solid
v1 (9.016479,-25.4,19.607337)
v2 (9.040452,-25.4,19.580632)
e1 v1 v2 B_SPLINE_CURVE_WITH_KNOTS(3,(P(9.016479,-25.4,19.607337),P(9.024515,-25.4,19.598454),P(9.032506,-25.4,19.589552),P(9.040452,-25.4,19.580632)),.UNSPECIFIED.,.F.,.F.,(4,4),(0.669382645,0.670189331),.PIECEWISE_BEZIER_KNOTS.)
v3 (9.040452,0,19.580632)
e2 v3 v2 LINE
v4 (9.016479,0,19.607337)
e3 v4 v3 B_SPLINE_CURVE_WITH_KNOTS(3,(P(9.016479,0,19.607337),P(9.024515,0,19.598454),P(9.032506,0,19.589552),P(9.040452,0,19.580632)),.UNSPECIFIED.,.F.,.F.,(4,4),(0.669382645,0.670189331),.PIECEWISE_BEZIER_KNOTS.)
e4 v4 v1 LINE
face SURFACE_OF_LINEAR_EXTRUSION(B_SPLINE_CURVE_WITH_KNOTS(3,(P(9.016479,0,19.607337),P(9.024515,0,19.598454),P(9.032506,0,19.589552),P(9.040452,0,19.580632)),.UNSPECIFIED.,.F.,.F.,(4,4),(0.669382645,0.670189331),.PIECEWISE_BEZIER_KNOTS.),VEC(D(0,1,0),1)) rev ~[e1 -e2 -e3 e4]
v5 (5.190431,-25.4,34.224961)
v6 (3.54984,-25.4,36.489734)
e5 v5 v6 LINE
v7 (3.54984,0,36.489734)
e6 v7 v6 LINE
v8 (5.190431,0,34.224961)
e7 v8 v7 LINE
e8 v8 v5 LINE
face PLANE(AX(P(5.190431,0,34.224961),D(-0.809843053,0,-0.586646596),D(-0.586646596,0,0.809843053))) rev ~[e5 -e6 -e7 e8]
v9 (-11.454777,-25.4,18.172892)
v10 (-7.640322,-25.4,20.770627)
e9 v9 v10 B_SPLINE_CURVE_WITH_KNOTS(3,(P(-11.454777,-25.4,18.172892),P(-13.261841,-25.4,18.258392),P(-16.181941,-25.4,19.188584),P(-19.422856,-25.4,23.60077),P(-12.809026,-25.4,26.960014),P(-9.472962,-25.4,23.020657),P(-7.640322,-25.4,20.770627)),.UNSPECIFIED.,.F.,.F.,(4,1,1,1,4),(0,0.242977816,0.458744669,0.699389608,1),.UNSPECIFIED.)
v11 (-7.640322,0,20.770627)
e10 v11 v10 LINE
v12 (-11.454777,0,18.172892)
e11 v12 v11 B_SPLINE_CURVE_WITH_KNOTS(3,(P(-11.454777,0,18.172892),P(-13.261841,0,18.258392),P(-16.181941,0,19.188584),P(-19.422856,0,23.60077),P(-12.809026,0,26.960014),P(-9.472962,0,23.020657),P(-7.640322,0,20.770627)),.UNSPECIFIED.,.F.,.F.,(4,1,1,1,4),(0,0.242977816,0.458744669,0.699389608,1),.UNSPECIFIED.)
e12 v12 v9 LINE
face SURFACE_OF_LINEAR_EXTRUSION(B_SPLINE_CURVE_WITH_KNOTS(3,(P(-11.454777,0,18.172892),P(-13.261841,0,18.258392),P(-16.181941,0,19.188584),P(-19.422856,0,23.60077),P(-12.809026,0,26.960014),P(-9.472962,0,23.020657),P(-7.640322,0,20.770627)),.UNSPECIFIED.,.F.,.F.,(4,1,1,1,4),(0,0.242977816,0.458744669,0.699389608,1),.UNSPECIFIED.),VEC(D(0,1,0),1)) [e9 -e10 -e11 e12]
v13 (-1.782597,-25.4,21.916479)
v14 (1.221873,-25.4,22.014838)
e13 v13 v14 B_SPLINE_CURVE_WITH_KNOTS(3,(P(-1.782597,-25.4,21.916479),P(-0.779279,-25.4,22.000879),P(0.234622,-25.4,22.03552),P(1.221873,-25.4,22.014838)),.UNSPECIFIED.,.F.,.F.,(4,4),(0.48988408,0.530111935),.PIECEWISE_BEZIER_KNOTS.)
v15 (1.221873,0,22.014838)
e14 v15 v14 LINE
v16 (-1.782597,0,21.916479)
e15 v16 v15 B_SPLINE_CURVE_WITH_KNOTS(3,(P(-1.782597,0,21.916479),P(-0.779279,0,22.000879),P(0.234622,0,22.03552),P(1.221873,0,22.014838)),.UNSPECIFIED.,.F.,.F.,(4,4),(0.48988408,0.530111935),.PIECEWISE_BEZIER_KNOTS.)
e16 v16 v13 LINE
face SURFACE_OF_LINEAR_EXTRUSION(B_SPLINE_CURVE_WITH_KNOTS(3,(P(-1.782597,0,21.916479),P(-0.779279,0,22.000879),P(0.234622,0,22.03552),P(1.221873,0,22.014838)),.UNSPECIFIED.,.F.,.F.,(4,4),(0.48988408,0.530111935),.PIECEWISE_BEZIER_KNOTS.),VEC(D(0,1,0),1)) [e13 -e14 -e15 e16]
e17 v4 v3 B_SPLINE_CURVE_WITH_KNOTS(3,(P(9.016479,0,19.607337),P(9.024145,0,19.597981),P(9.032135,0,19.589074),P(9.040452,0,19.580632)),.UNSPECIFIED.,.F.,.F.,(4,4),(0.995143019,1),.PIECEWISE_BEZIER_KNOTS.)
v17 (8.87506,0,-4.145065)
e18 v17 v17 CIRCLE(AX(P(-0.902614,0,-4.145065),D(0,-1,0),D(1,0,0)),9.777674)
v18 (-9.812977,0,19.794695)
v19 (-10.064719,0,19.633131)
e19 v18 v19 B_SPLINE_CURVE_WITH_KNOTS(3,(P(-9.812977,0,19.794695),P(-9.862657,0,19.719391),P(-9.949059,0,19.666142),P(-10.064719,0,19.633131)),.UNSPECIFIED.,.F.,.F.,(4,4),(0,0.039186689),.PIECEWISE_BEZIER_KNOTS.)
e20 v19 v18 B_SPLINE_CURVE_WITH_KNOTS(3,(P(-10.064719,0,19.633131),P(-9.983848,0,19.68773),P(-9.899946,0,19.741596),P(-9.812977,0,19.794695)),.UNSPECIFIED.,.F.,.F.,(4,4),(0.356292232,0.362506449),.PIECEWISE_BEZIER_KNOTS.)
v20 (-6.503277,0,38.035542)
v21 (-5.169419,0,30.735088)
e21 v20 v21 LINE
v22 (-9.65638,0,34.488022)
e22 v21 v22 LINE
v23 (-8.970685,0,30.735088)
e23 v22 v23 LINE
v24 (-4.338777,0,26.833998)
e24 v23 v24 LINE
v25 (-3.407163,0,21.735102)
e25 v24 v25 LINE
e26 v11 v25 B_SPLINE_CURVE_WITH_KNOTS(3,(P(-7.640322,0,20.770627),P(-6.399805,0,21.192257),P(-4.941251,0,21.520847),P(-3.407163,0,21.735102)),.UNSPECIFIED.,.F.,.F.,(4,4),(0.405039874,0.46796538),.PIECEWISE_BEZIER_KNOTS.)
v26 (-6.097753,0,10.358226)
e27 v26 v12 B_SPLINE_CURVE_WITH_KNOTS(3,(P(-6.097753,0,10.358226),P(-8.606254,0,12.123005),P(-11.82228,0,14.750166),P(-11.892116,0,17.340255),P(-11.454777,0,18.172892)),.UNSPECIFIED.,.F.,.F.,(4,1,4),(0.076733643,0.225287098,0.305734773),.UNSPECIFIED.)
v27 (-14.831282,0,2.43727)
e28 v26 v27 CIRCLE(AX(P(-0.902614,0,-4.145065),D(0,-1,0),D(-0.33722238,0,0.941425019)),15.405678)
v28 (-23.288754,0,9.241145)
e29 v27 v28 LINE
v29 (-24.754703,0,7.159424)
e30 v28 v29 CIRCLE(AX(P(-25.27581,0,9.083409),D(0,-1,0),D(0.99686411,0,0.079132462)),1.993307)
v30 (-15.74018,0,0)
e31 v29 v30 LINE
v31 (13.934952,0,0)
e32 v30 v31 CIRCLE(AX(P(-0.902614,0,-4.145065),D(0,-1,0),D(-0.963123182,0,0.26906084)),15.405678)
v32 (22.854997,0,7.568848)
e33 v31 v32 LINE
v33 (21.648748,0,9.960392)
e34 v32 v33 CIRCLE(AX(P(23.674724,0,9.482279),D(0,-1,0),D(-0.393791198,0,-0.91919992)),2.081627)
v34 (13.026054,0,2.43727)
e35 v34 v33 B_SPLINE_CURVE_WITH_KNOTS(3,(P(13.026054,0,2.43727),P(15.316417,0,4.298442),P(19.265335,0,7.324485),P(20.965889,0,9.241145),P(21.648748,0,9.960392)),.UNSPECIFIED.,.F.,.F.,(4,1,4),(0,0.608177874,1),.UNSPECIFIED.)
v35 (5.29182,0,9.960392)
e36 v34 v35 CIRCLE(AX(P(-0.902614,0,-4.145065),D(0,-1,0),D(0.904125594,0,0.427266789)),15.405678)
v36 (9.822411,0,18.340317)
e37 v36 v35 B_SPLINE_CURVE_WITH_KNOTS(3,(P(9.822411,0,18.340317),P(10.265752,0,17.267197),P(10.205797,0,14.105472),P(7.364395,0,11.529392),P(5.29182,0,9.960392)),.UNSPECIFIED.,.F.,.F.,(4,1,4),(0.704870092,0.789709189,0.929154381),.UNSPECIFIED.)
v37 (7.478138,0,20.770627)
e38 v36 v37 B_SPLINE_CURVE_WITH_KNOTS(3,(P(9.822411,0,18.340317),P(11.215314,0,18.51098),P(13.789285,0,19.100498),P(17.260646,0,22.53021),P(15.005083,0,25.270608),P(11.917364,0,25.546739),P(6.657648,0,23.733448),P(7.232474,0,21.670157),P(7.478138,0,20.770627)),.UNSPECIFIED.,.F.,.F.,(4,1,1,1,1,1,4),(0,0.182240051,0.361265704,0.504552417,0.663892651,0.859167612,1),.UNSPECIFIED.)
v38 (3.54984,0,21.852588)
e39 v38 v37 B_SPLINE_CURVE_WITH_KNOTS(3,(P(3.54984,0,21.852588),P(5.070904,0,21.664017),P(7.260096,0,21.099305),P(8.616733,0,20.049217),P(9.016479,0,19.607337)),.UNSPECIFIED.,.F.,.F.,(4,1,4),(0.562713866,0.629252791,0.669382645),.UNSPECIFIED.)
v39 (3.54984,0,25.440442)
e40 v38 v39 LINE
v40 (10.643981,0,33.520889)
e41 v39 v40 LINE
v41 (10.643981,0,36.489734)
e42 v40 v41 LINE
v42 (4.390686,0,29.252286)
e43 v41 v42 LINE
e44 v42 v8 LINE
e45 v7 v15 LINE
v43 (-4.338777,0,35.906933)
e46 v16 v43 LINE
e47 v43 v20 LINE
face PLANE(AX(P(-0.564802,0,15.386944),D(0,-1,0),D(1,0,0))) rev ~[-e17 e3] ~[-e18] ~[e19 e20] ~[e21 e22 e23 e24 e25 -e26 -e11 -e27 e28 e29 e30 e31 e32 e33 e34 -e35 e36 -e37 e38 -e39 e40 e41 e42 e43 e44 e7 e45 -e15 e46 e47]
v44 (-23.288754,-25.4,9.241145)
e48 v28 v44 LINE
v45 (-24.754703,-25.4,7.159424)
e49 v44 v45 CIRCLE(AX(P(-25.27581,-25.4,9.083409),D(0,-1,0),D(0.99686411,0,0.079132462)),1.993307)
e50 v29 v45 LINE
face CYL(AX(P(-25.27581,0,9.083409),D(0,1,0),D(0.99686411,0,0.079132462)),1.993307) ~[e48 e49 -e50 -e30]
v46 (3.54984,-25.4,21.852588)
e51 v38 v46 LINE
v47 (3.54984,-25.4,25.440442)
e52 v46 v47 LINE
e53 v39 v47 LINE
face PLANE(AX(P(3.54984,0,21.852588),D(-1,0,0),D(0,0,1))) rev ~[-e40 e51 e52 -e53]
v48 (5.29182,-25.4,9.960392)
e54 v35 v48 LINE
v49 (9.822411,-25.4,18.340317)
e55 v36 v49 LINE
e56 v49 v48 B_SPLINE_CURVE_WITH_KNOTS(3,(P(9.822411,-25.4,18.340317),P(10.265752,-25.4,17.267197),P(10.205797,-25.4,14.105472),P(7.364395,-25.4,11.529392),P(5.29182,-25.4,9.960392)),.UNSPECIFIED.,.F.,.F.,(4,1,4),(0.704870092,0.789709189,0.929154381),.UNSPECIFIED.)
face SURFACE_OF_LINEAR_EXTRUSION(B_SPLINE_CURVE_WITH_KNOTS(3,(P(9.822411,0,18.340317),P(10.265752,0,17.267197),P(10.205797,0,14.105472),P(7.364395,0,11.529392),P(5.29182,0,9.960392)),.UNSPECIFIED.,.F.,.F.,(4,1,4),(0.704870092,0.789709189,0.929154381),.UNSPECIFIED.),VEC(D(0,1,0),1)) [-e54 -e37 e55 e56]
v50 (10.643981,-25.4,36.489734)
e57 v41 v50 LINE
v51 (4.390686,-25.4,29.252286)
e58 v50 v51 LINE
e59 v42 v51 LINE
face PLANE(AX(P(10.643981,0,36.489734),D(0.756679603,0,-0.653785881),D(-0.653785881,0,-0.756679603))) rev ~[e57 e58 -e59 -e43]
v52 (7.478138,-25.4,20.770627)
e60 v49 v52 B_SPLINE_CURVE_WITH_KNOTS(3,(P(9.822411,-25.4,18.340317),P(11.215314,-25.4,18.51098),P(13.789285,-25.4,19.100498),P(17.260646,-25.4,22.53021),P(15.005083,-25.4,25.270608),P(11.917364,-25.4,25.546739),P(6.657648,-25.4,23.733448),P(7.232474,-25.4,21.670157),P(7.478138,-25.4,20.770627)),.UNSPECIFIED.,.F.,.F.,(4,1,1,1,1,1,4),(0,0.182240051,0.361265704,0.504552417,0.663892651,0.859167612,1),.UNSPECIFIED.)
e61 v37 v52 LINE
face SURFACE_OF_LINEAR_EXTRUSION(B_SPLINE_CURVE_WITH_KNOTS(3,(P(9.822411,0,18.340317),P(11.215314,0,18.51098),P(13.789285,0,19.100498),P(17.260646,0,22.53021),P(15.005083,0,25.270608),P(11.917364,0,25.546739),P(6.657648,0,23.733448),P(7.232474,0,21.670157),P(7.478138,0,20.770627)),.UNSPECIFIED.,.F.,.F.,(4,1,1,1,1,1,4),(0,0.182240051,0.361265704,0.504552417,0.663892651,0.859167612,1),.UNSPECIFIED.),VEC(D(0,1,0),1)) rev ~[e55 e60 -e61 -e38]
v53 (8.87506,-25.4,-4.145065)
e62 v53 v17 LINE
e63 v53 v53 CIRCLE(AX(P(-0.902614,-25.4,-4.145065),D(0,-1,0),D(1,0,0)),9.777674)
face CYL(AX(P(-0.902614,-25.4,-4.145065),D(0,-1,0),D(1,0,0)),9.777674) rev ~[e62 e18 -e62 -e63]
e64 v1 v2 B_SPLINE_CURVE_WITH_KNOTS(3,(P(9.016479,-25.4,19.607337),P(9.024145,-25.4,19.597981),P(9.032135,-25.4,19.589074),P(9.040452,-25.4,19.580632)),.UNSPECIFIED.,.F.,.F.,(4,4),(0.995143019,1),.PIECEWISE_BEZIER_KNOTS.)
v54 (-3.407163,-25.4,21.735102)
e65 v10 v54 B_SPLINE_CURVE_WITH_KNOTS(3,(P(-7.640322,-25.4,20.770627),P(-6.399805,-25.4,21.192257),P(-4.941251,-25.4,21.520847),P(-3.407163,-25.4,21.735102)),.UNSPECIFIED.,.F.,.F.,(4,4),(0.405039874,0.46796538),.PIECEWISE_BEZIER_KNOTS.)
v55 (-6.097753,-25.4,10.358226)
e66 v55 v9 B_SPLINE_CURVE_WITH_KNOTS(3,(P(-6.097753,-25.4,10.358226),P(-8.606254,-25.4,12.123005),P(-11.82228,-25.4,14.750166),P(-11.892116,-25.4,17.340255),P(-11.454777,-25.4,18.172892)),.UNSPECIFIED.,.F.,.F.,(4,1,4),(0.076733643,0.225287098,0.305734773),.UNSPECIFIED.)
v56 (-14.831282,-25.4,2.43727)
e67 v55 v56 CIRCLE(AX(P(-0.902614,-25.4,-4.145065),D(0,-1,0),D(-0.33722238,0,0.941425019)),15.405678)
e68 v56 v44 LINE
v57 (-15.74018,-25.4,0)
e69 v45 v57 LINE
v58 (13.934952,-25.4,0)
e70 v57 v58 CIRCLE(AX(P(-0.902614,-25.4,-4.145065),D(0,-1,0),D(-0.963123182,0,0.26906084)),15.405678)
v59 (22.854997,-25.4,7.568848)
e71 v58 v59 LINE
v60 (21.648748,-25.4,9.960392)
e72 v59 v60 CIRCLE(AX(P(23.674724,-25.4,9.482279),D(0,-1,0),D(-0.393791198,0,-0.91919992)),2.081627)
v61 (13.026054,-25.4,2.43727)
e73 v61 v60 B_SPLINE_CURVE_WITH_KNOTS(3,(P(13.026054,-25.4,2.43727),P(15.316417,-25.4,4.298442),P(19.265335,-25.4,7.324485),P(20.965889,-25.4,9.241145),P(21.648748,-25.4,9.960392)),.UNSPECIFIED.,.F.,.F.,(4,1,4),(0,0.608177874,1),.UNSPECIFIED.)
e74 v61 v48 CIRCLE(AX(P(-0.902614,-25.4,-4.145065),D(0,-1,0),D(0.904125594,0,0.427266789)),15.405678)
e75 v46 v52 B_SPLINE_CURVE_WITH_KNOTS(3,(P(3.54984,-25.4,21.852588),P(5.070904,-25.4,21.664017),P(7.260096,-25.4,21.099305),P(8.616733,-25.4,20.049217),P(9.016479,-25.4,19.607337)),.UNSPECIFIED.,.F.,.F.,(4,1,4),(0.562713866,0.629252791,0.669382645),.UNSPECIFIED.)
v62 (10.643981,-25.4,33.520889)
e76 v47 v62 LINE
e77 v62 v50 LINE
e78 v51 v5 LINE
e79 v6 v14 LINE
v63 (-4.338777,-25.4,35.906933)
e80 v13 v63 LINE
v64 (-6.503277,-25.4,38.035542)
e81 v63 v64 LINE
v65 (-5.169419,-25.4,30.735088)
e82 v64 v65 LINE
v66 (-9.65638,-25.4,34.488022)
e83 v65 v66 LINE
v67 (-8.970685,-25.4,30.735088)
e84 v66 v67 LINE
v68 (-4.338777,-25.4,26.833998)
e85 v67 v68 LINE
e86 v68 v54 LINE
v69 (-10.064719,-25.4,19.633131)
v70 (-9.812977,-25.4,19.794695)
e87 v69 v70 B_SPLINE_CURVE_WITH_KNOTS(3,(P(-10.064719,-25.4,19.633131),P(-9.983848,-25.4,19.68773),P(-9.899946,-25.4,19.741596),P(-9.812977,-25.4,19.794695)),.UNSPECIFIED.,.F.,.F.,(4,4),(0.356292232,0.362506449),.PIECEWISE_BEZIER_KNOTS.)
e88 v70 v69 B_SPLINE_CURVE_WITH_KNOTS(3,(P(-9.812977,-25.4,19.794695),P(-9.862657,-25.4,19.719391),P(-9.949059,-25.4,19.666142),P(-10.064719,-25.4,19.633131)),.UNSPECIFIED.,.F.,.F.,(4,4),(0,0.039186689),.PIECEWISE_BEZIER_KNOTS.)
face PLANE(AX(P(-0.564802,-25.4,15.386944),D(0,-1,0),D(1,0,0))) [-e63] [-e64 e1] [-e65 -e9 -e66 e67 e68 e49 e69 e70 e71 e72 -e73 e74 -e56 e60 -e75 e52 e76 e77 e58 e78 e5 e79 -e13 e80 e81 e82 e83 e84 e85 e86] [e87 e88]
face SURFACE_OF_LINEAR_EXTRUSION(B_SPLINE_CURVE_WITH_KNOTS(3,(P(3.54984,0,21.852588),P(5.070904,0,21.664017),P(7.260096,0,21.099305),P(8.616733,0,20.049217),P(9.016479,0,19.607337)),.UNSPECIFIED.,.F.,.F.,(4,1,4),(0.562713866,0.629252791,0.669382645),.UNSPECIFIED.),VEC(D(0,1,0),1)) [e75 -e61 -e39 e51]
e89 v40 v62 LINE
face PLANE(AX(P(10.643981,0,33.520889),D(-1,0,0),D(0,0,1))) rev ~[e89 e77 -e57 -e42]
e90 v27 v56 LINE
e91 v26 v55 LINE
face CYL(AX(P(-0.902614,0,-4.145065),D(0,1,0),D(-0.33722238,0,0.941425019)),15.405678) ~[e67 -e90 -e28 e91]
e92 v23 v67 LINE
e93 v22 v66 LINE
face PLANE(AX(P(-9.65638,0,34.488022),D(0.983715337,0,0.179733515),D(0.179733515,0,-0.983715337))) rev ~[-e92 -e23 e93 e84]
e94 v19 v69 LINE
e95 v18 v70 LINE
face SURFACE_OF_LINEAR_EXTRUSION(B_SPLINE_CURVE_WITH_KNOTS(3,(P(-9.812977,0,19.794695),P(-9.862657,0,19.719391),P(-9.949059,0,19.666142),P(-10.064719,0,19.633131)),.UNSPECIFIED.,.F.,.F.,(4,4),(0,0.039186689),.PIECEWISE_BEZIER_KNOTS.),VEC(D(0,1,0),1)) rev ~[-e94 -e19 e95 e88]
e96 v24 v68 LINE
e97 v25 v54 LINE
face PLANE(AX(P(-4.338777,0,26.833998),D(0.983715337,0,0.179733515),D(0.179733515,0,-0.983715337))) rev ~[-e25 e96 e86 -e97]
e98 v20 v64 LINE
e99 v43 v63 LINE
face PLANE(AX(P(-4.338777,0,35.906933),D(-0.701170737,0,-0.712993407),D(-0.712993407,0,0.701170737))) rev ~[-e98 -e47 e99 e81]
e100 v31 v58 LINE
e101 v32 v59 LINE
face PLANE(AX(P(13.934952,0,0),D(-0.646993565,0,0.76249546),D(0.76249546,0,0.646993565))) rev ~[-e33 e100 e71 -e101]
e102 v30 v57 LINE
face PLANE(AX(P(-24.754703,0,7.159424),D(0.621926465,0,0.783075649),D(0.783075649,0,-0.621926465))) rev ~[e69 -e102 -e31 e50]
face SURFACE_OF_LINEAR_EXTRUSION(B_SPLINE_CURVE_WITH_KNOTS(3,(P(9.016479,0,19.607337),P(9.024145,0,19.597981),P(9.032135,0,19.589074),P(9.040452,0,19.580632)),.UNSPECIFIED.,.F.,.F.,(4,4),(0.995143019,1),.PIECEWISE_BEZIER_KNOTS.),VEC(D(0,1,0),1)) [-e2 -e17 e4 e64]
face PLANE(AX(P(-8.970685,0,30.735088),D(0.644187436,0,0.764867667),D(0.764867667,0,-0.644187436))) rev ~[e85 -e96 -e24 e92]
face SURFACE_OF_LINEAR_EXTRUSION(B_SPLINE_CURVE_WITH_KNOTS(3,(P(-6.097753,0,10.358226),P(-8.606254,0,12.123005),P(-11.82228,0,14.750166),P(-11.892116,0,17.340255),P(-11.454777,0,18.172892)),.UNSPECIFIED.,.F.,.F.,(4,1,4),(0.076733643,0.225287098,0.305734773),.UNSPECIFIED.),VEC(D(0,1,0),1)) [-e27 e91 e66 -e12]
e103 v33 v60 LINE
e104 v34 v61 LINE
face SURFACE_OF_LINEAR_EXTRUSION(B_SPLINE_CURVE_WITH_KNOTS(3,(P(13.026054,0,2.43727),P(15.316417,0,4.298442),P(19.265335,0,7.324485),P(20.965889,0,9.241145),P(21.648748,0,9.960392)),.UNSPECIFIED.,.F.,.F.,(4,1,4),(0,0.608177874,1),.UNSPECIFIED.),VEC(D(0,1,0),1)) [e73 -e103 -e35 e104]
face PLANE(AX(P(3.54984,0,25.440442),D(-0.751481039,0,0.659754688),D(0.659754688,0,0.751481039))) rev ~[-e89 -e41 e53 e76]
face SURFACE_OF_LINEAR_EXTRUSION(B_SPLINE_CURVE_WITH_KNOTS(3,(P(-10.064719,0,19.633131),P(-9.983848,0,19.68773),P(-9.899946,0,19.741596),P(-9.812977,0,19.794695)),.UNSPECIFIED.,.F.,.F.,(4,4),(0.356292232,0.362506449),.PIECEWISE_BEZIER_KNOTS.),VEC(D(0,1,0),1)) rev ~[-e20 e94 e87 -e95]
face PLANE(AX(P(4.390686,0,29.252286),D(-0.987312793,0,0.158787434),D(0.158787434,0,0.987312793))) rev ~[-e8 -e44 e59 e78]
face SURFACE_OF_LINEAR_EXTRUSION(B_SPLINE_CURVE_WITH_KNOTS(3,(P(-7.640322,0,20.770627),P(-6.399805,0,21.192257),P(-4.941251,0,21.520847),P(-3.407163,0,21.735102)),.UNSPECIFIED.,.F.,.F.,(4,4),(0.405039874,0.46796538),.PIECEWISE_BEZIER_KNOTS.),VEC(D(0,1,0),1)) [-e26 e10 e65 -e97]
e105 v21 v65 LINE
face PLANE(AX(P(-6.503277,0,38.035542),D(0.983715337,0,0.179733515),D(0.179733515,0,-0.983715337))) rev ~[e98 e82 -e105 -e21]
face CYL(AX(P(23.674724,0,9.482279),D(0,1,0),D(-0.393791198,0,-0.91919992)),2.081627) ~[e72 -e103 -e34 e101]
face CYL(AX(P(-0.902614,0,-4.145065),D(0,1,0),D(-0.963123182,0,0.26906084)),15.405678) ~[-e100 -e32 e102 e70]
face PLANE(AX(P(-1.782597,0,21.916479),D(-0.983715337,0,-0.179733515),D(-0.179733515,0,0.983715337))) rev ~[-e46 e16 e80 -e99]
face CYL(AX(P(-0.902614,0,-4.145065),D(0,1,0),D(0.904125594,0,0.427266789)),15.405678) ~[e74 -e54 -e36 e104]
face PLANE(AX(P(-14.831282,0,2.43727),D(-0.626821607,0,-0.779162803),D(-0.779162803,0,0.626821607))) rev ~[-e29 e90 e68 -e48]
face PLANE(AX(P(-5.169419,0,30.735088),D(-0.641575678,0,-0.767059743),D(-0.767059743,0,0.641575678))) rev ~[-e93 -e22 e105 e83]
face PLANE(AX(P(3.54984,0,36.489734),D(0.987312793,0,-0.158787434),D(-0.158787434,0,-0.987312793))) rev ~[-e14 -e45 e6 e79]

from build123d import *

# Parameters (mm, degrees)
F0_R     = 1.2343431581
F0_R_2   = 1.1676202912
F1_DEPTH = 25.4
F2_R     = 9.777673903
F3_DEPTH = 25.4010001


# Not quite as in the source:
# - a feature names something its author has since deleted; it is built from what else it names


with BuildPart() as f1:
    # F0 (on Front) → F1 (new body)
    with BuildSketch(Plane.XZ):
        with BuildLine():
            ThreePointArc((-1.9968199656, 7.5688475417), (0, 9.5656675073), (1.9968199656, 7.5688475417))
            add(Edge.make_bspline(
                [(3.2633473205, 8.4793044276), (2.841689417, 8.1773369558), (2.417681238, 7.8743128728), (1.9968199656, 7.5688475417)],
                knots=[0.9731401377, 0.9731401377, 0.9731401377, 0.9731401377, 1, 1, 1, 1], degree=3))
            add(Edge.make_bspline(
                [(5.291820418, 9.9603919059), (4.6380599048, 9.4654757695), (3.9538550257, 8.9738068766), (3.2633473205, 8.4793044276)],
                knots=[0.9291543812, 0.9291543812, 0.9291543812, 0.9291543812, 0.9731401377, 0.9731401377, 0.9731401377, 0.9731401377], degree=3))
            add(Edge.make_bspline(
                [(9.8224105557, 18.3403169376), (10.2657515128, 17.2671971534), (10.2057973933, 14.1054721398), (7.3643949931, 11.5293924505), (5.291820418, 9.9603919059)],
                knots=[0.7048700925, 0.7048700925, 0.7048700925, 0.7048700925, 0.7897091886, 0.9291543812, 0.9291543812, 0.9291543812, 0.9291543812], degree=3))
            add(Edge.make_bspline(
                [(9.0404523602, 19.5806321203), (9.3820768283, 19.1971335676), (9.6411804083, 18.7789898223), (9.8224105557, 18.3403169376)],
                knots=[0.6701893312, 0.6701893312, 0.6701893312, 0.6701893312, 0.7048700925, 0.7048700925, 0.7048700925, 0.7048700925], degree=3))
            add(Edge.make_bspline(
                [(9.0164794626, 19.6073366215), (9.0241449488, 19.5979806062), (9.0321349993, 19.5890743409), (9.0404523602, 19.5806321203)],
                knots=[0.9951430193, 0.9951430193, 0.9951430193, 0.9951430193, 1, 1, 1, 1], degree=3))
            add(Edge.make_bspline(
                [(7.4781377275, 20.7706270595), (8.1063529664, 20.4442707486), (8.6167334364, 20.0492172461), (9.0164794626, 19.6073366215)],
                knots=[0.6292527912, 0.6292527912, 0.6292527912, 0.6292527912, 0.6693826452, 0.6693826452, 0.6693826452, 0.6693826452], degree=3))
            add(Edge.make_bspline(
                [(3.5498395186, 21.8525875291), (5.0709035737, 21.6640168859), (6.4365000788, 21.3117553214), (7.4781377275, 20.7706270595)],
                knots=[0.562713866, 0.562713866, 0.562713866, 0.562713866, 0.6292527912, 0.6292527912, 0.6292527912, 0.6292527912], degree=3))
            add(Edge.make_bspline(
                [(1.2218726617, 22.0148384046), (2.0219718496, 21.9980775903), (2.8045671105, 21.9449810722), (3.5498395186, 21.8525875291)],
                knots=[0.5301119353, 0.5301119353, 0.5301119353, 0.5301119353, 0.562713866, 0.562713866, 0.562713866, 0.562713866], degree=3))
            add(Edge.make_bspline(
                [(-1.7825967517, 21.9164786942), (-0.7792787738, 22.0008787252), (0.2346221093, 22.0355197444), (1.2218726617, 22.0148384046)],
                knots=[0.4898840803, 0.4898840803, 0.4898840803, 0.4898840803, 0.5301119353, 0.5301119353, 0.5301119353, 0.5301119353], degree=3))
            add(Edge.make_bspline(
                [(-3.4071633919, 21.7351022024), (-2.8727981588, 21.8097333743), (-2.3292683633, 21.8704921755), (-1.7825967517, 21.9164786942)],
                knots=[0.4679653797, 0.4679653797, 0.4679653797, 0.4679653797, 0.4898840803, 0.4898840803, 0.4898840803, 0.4898840803], degree=3))
            add(Edge.make_bspline(
                [(-7.6403221771, 20.7706270595), (-6.3998054208, 21.1922572452), (-4.9412508039, 21.5208466068), (-3.4071633919, 21.7351022024)],
                knots=[0.4050398738, 0.4050398738, 0.4050398738, 0.4050398738, 0.4679653797, 0.4679653797, 0.4679653797, 0.4679653797], degree=3))
            add(Edge.make_bspline(
                [(-9.8129768452, 19.7946945944), (-9.2177162529, 20.158130564), (-8.4788283728, 20.4856333089), (-7.6403221771, 20.7706270595)],
                knots=[0.3625064487, 0.3625064487, 0.3625064487, 0.3625064487, 0.4050398738, 0.4050398738, 0.4050398738, 0.4050398738], degree=3))
            add(Edge.make_bspline(
                [(-9.8129768452, 19.7946945944), (-9.8626572034, 19.7193909877), (-9.9490587456, 19.6661416758), (-10.0647194767, 19.6331309022)],
                knots=[0, 0, 0, 0, 0.0391866891, 0.0391866891, 0.0391866891, 0.0391866891], degree=3))
            add(Edge.make_bspline(
                [(-11.4547769714, 18.1728920256), (-11.1799307011, 18.6961641136), (-10.722667508, 19.1889237515), (-10.0647194767, 19.6331309022)],
                knots=[0.3057347726, 0.3057347726, 0.3057347726, 0.3057347726, 0.3562922319, 0.3562922319, 0.3562922319, 0.3562922319], degree=3))
            add(Edge.make_bspline(
                [(-6.0977533046, 10.3582262113), (-8.6062536302, 12.1230052446), (-11.8222803026, 14.7501658532), (-11.892115865, 17.3402547999), (-11.4547769714, 18.1728920256)],
                knots=[0.0767336432, 0.0767336432, 0.0767336432, 0.0767336432, 0.2252870982, 0.3057347726, 0.3057347726, 0.3057347726, 0.3057347726], degree=3))
            add(Edge.make_bspline(
                [(-3.9700187942, 8.9003053831), (-4.698469629, 9.3913862847), (-5.4138065645, 9.877056305), (-6.0977533046, 10.3582262113)],
                knots=[0.0362302993, 0.0362302993, 0.0362302993, 0.0362302993, 0.0767336432, 0.0767336432, 0.0767336432, 0.0767336432], degree=3))
            add(Edge.make_bspline(
                [(-1.9968199656, 7.5688475417), (-2.6563252964, 8.0174308154), (-3.3184184759, 8.4610328111), (-3.9700187942, 8.9003053831)],
                knots=[0, 0, 0, 0, 0.0362302993, 0.0362302993, 0.0362302993, 0.0362302993], degree=3))
        make_face()
        with Locations((-2.5474067745, 12.413466867)):
            Circle(F0_R, mode=Mode.SUBTRACT)
        with Locations((1.6244133145, 12.2344455942)):
            Circle(F0_R_2, mode=Mode.SUBTRACT)
        with BuildLine():
            ThreePointArc((-1.9968199656, 7.5688475417), (0, 5.5720275761), (1.9968199656, 7.5688475417))
            ThreePointArc((1.9968199656, 7.5688475417), (0, 9.5656675073), (-1.9968199656, 7.5688475417))
        make_face()
        with BuildLine():
            add(Edge.make_bspline(
                [(-11.4547769714, 18.1728920256), (-13.2618411574, 18.2583922451), (-16.1819405075, 19.1885835024), (-19.4228561636, 23.6007697874), (-12.8090262125, 26.9600135992), (-9.4729623186, 23.020656954), (-7.6403221771, 20.7706270595)],
                knots=[0, 0, 0, 0, 0.2429778163, 0.4587446686, 0.6993896075, 1, 1, 1, 1], degree=3))
            add(Edge.make_bspline(
                [(-11.4547769714, 18.1728920256), (-11.1799307011, 18.6961641136), (-10.722667508, 19.1889237515), (-10.0647194767, 19.6331309022)],
                knots=[0.3057347726, 0.3057347726, 0.3057347726, 0.3057347726, 0.3562922319, 0.3562922319, 0.3562922319, 0.3562922319], degree=3))
            add(Edge.make_bspline(
                [(-10.0647194767, 19.6331309022), (-10.7420183544, 19.4398227702), (-14.127166026, 20.448341035), (-16.206710897, 23.9906258668), (-11.9787863154, 23.137781592), (-9.4800821705, 20.299283743), (-9.8129768452, 19.7946945944)],
                knots=[0.0391866891, 0.0391866891, 0.0391866891, 0.0391866891, 0.2686604293, 0.5013914501, 0.7374205704, 1, 1, 1, 1], degree=3))
            add(Edge.make_bspline(
                [(-9.8129768452, 19.7946945944), (-9.2177162529, 20.158130564), (-8.4788283728, 20.4856333089), (-7.6403221771, 20.7706270595)],
                knots=[0.3625064487, 0.3625064487, 0.3625064487, 0.3625064487, 0.4050398738, 0.4050398738, 0.4050398738, 0.4050398738], degree=3))
        make_face()
        with BuildLine():
            Line((-4.3387768686, 26.8339979934), (-3.4071633919, 21.7351022024))
            add(Edge.make_bspline(
                [(-3.4071633919, 21.7351022024), (-2.8727981588, 21.8097333743), (-2.3292683633, 21.8704921755), (-1.7825967517, 21.9164786942)],
                knots=[0.4679653797, 0.4679653797, 0.4679653797, 0.4679653797, 0.4898840803, 0.4898840803, 0.4898840803, 0.4898840803], degree=3))
            Line((-1.7825967517, 21.9164786942), (-4.3387768686, 35.9069332823))
            Line((-4.3387768686, 35.9069332823), (-6.5032765269, 38.0355417728))
            Line((-6.5032765269, 38.0355417728), (-5.1694188174, 30.7350876349))
            Line((-5.1694188174, 30.7350876349), (-9.6563799307, 34.4880223274))
            Line((-9.6563799307, 34.4880223274), (-8.9706854823, 30.7350876349))
            Line((-8.9706854823, 30.7350876349), (-4.3387768686, 26.8339979934))
        make_face()
        with BuildLine():
            add(Edge.make_bspline(
                [(-10.0647194767, 19.6331309022), (-10.7420183544, 19.4398227702), (-14.127166026, 20.448341035), (-16.206710897, 23.9906258668), (-11.9787863154, 23.137781592), (-9.4800821705, 20.299283743), (-9.8129768452, 19.7946945944)],
                knots=[0.0391866891, 0.0391866891, 0.0391866891, 0.0391866891, 0.2686604293, 0.5013914501, 0.7374205704, 1, 1, 1, 1], degree=3))
            add(Edge.make_bspline(
                [(-10.0647194767, 19.6331309022), (-9.9838484879, 19.687730156), (-9.899945585, 19.7415958866), (-9.8129768452, 19.7946945944)],
                knots=[0.3562922319, 0.3562922319, 0.3562922319, 0.3562922319, 0.3625064487, 0.3625064487, 0.3625064487, 0.3625064487], degree=3))
        make_face()
        with BuildLine():
            add(Edge.make_bspline(
                [(1.2218726617, 22.0148384046), (2.0219718496, 21.9980775903), (2.8045671105, 21.9449810722), (3.5498395186, 21.8525875291)],
                knots=[0.5301119353, 0.5301119353, 0.5301119353, 0.5301119353, 0.562713866, 0.562713866, 0.562713866, 0.562713866], degree=3))
            Line((3.5498395186, 21.8525875291), (3.5498395186, 25.4404416609))
            Line((3.5498395186, 25.4404416609), (10.6439810566, 33.5208887535))
            Line((10.6439810566, 33.5208887535), (10.6439810566, 36.4897335443))
            Line((10.6439810566, 36.4897335443), (4.3906857101, 29.2522859745))
            Line((4.3906857101, 29.2522859745), (5.1904305148, 34.224960801))
            Line((5.1904305148, 34.224960801), (3.5498395186, 36.4897335443))
            Line((3.5498395186, 36.4897335443), (1.2218726617, 22.0148384046))
        make_face()
        with BuildLine():
            add(Edge.make_bspline(
                [(9.0404523602, 19.5806321203), (9.3820768283, 19.1971335676), (9.6411804083, 18.7789898223), (9.8224105557, 18.3403169376)],
                knots=[0.6701893312, 0.6701893312, 0.6701893312, 0.6701893312, 0.7048700925, 0.7048700925, 0.7048700925, 0.7048700925], degree=3))
            add(Edge.make_bspline(
                [(9.8224105557, 18.3403169376), (11.2153140722, 18.5109801218), (13.7892848388, 19.1004981723), (17.2606461127, 22.5302099032), (15.0050826028, 25.2706081918), (11.9173641085, 25.5467387461), (6.6576478669, 23.7334481834), (7.2324744651, 21.6701568434), (7.4781377275, 20.7706270595)],
                knots=[0, 0, 0, 0, 0.1822400506, 0.3612657036, 0.5045524169, 0.663892651, 0.8591676122, 1, 1, 1, 1], degree=3))
            add(Edge.make_bspline(
                [(7.4781377275, 20.7706270595), (8.1063529664, 20.4442707486), (8.6167334364, 20.0492172461), (9.0164794626, 19.6073366215)],
                knots=[0.6292527912, 0.6292527912, 0.6292527912, 0.6292527912, 0.6693826452, 0.6693826452, 0.6693826452, 0.6693826452], degree=3))
            add(Edge.make_bspline(
                [(9.0404523602, 19.5806321203), (9.4784020758, 19.1361079274), (12.0293402458, 20.7326500765), (13.9949567764, 23.4997662714), (9.668194415, 23.7104945441), (8.5939298141, 20.1230744252), (9.0164794626, 19.6073366215)],
                knots=[0, 0, 0, 0, 0.255743784, 0.4848908681, 0.7274084652, 0.9951430193, 0.9951430193, 0.9951430193, 0.9951430193], degree=3))
        make_face()
        with BuildLine():
            add(Edge.make_bspline(
                [(9.0164794626, 19.6073366215), (9.0245151148, 19.598453984), (9.0325060612, 19.5895524244), (9.0404523602, 19.5806321203)],
                knots=[0.6693826452, 0.6693826452, 0.6693826452, 0.6693826452, 0.6701893312, 0.6701893312, 0.6701893312, 0.6701893312], degree=3))
            add(Edge.make_bspline(
                [(9.0404523602, 19.5806321203), (9.4784020758, 19.1361079274), (12.0293402458, 20.7326500765), (13.9949567764, 23.4997662714), (9.668194415, 23.7104945441), (8.5939298141, 20.1230744252), (9.0164794626, 19.6073366215)],
                knots=[0, 0, 0, 0, 0.255743784, 0.4848908681, 0.7274084652, 0.9951430193, 0.9951430193, 0.9951430193, 0.9951430193], degree=3))
        make_face()
        with Locations((1.6244133145, 12.2344455942)):
            Circle(F0_R_2)
        with Locations((-2.5474067745, 12.413466867)):
            Circle(F0_R)
        with BuildLine():
            add(Edge.make_bspline(
                [(3.2633473205, 8.4793044276), (2.841689417, 8.1773369558), (2.417681238, 7.8743128728), (1.9968199656, 7.5688475417)],
                knots=[0.9731401377, 0.9731401377, 0.9731401377, 0.9731401377, 1, 1, 1, 1], degree=3))
            ThreePointArc((1.9968199656, 7.5688475417), (0, 5.5720275761), (-1.9968199656, 7.5688475417))
            add(Edge.make_bspline(
                [(-1.9968199656, 7.5688475417), (-2.6563252964, 8.0174308154), (-3.3184184759, 8.4610328111), (-3.9700187942, 8.9003053831)],
                knots=[0, 0, 0, 0, 0.0362302993, 0.0362302993, 0.0362302993, 0.0362302993], degree=3))
            add(Edge.make_bspline(
                [(-3.9700187942, 8.9003053831), (-6.9902118362, 5.8201430862), (-12.8862109887, 0.4369124192), (-11.7946728285, -6.7063142641), (-9.2590422156, -17.5990966335), (-6.1766836432, -4.8008390766), (-1.1883774497, -21.4983309099), (-1.4966768799, -5.6799294478), (8.3885389188, -20.2079907911), (4.1770733312, -2.7890633953), (11.961574095, -14.0816381699), (8.986776897, -0.572525648), (13.2777598832, -8.0107441312), (11.4445848325, 4.674510475), (6.1620931725, 7.1594239129), (3.2633473205, 8.4793044276)],
                knots=[0, 0, 0, 0, 0.1016288045, 0.1850105958, 0.2605805278, 0.3277901899, 0.4097509261, 0.481040342, 0.5604810392, 0.6410163658, 0.7044948285, 0.7793548179, 0.825264206, 0.9078715102, 1, 1, 1, 1], degree=3))
        make_face()
        with BuildLine():
            add(Edge.make_bspline(
                [(5.291820418, 9.9603919059), (4.6380599048, 9.4654757695), (3.9538550257, 8.9738068766), (3.2633473205, 8.4793044276)],
                knots=[0.9291543812, 0.9291543812, 0.9291543812, 0.9291543812, 0.9731401377, 0.9731401377, 0.9731401377, 0.9731401377], degree=3))
            add(Edge.make_bspline(
                [(-3.9700187942, 8.9003053831), (-6.9902118362, 5.8201430862), (-12.8862109887, 0.4369124192), (-11.7946728285, -6.7063142641), (-9.2590422156, -17.5990966335), (-6.1766836432, -4.8008390766), (-1.1883774497, -21.4983309099), (-1.4966768799, -5.6799294478), (8.3885389188, -20.2079907911), (4.1770733312, -2.7890633953), (11.961574095, -14.0816381699), (8.986776897, -0.572525648), (13.2777598832, -8.0107441312), (11.4445848325, 4.674510475), (6.1620931725, 7.1594239129), (3.2633473205, 8.4793044276)],
                knots=[0, 0, 0, 0, 0.1016288045, 0.1850105958, 0.2605805278, 0.3277901899, 0.4097509261, 0.481040342, 0.5604810392, 0.6410163658, 0.7044948285, 0.7793548179, 0.825264206, 0.9078715102, 1, 1, 1, 1], degree=3))
            add(Edge.make_bspline(
                [(-3.9700187942, 8.9003053831), (-4.698469629, 9.3913862847), (-5.4138065645, 9.877056305), (-6.0977533046, 10.3582262113)],
                knots=[0.0362302993, 0.0362302993, 0.0362302993, 0.0362302993, 0.0767336432, 0.0767336432, 0.0767336432, 0.0767336432], degree=3))
            ThreePointArc((-6.0977533046, 10.3582262113), (-11.2522703526, 7.2663125794), (-14.8312818353, 2.4372699504))
            Line((-14.8312818353, 2.4372699504), (-23.2887535927, 9.2411445911))
            ThreePointArc((-23.2887535927, 9.2411445911), (-26.9055674019, 10.2310859611), (-24.7547028528, 7.1594239129))
            Line((-24.7547028528, 7.1594239129), (-15.7401796902, 0))
            ThreePointArc((-15.7401796902, 0), (-0.9026138185, -19.5507430015), (13.9349520533, 0))
            Line((13.9349520533, 0), (22.8549973194, 7.5688475417))
            ThreePointArc((22.8549973194, 7.5688475417), (25.5333188907, 10.4197188603), (21.6487478123, 9.9603919059))
            add(Edge.make_bspline(
                [(13.0260541983, 2.4372699504), (15.3164169129, 4.298441963), (19.2653346729, 7.3244846795), (20.9658887146, 9.2411445911), (21.6487478123, 9.9603919059)],
                knots=[0, 0, 0, 0, 0.6081778742, 1, 1, 1, 1], degree=3))
            ThreePointArc((13.0260541983, 2.4372699504), (9.8390877256, 6.8980675437), (5.291820418, 9.9603919059))
        make_face()
    extrude(amount=F1_DEPTH)

    # F2 (on face) → F3 (cut, through all)
    with BuildSketch(Plane.XZ.offset(25.4)):
        with Locations((-0.9026138185, -4.14506474)):
            Circle(F2_R)
    extrude(amount=-F3_DEPTH, mode=Mode.SUBTRACT)


solid = f1.part
